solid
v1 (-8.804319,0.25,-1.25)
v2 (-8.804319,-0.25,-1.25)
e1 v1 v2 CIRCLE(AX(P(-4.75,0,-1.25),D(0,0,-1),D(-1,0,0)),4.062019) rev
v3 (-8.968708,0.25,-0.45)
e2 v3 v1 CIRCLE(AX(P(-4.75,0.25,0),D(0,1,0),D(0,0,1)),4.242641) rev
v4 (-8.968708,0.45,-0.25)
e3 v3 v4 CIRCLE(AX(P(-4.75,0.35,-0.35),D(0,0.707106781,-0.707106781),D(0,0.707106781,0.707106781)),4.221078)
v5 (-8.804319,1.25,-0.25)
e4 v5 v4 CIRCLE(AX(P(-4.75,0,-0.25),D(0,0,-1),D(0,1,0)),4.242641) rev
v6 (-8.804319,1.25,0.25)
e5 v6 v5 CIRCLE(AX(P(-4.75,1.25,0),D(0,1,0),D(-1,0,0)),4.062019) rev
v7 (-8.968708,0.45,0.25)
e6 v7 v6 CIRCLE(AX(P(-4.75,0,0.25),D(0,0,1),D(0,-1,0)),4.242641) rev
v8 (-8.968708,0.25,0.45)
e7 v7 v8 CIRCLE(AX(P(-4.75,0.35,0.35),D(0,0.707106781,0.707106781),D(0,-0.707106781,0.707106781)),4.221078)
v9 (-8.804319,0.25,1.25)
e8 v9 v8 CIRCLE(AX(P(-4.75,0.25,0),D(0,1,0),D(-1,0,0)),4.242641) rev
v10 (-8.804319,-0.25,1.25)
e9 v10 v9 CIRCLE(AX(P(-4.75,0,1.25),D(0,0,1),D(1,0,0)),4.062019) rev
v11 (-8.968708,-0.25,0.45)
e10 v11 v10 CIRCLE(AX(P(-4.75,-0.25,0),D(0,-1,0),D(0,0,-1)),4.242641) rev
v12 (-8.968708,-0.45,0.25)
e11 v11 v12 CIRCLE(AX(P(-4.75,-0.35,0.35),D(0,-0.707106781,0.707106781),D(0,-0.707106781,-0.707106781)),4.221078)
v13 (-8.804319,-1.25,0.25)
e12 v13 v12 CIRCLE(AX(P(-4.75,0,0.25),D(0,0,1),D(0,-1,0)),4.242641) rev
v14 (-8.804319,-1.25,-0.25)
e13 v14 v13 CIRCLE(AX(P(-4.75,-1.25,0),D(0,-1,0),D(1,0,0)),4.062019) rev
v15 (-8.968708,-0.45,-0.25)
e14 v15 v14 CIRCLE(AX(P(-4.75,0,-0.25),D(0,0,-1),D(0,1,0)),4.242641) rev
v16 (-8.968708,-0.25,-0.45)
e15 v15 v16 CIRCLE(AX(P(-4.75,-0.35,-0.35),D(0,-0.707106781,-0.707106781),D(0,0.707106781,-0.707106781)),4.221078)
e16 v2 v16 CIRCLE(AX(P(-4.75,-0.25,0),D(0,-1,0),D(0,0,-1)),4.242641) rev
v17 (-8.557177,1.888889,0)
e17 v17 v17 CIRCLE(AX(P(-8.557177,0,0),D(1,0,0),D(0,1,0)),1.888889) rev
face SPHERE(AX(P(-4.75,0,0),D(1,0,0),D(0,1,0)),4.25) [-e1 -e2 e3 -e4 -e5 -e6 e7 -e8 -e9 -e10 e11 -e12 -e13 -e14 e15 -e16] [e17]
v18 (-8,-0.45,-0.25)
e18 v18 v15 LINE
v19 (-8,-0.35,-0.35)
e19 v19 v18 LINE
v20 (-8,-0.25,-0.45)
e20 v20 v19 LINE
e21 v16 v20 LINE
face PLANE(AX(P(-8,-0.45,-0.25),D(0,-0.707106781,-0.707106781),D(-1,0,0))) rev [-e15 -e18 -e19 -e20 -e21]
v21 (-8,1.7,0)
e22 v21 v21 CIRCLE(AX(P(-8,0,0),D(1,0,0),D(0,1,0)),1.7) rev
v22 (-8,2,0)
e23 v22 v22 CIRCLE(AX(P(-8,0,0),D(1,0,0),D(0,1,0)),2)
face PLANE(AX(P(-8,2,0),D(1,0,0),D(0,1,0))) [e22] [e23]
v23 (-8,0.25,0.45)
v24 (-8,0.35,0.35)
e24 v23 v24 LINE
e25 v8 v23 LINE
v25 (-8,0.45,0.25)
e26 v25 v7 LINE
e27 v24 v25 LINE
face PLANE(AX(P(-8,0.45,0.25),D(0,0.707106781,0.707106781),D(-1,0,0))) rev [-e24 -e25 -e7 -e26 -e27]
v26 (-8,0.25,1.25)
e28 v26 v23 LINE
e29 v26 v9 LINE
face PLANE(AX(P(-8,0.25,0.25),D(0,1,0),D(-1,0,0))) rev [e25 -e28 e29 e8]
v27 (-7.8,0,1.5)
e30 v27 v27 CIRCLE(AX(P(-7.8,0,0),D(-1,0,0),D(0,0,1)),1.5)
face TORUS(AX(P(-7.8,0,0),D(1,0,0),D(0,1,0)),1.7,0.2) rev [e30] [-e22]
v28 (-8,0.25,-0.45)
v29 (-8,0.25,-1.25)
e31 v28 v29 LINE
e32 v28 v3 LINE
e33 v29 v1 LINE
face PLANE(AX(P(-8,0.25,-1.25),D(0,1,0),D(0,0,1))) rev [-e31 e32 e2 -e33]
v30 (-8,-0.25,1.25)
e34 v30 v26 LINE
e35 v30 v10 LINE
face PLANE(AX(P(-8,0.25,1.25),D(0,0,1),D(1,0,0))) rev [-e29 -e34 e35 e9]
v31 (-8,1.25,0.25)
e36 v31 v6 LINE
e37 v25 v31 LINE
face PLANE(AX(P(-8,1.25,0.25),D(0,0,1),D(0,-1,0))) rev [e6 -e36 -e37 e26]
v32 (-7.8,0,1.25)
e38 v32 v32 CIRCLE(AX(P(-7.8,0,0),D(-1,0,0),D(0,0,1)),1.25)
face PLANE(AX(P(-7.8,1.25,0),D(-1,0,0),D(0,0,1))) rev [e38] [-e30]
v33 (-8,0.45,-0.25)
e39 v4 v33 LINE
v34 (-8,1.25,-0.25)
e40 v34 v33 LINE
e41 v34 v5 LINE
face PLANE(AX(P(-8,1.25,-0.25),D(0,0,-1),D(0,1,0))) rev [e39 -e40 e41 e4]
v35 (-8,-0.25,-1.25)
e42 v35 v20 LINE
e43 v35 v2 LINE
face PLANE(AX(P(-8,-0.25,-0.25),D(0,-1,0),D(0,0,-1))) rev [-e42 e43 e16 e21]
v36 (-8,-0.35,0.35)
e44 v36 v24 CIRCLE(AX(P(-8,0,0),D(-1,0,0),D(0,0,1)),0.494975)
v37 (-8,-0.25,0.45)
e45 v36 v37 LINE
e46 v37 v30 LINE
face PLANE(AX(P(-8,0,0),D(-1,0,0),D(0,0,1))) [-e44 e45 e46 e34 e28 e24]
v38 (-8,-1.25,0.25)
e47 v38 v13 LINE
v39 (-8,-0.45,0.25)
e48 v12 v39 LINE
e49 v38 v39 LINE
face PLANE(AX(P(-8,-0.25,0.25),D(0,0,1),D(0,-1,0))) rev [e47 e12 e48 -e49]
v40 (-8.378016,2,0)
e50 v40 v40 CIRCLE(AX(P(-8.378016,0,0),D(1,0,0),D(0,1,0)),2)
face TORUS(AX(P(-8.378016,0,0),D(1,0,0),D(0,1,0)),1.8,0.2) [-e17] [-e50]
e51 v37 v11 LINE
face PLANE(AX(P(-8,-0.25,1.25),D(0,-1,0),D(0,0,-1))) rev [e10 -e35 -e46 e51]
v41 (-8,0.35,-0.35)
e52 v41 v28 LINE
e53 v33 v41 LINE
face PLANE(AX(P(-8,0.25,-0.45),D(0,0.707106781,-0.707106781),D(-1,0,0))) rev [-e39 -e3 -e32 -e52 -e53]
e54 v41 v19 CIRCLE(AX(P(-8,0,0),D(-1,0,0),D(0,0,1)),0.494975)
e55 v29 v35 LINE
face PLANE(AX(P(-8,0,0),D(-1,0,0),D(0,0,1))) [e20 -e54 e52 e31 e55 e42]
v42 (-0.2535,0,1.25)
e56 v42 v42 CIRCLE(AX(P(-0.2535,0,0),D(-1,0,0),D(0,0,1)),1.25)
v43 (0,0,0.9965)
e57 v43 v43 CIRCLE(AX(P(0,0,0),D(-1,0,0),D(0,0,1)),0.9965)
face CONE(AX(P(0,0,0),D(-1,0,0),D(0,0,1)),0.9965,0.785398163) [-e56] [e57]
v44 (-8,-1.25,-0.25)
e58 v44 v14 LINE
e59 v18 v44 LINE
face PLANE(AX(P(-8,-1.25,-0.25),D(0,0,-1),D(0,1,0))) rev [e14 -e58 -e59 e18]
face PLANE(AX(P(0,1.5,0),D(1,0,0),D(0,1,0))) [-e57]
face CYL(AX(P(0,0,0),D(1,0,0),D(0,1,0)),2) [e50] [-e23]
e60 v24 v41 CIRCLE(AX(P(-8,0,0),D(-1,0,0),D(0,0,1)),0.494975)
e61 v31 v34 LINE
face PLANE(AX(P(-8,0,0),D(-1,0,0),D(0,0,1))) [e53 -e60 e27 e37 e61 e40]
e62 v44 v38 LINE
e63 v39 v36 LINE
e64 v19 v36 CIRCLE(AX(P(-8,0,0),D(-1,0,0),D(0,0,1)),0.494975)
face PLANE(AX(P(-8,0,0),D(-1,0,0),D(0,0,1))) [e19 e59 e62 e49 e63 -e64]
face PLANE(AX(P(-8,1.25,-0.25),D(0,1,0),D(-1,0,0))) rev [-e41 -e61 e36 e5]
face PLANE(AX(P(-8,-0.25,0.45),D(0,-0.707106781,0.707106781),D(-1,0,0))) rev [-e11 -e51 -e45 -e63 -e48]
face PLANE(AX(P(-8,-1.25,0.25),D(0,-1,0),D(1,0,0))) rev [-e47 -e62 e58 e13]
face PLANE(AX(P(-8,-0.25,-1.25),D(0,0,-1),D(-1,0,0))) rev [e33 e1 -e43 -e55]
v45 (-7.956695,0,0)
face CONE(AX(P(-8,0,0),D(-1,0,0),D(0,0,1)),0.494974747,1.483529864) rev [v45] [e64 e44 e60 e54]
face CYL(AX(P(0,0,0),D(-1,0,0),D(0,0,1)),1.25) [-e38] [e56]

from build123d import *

# Parameters (mm, degrees)
ENL_V_MAT_EXTRU_1_DEPTH = 1
CHANFREIN1_SIZE         = 0.2
CONG_1_R                = 0.2
CONG_2_R                = 0.2


# Read off the part's stored shape, not the designer's step: M2.5 Filetages mécaniques Borne3
with BuildPart() as part:
    # Esquisse1 → Révolution1 (revolve)
    with BuildSketch(Plane.XY):
        with BuildLine():
            Line((0, 0), (-9, 0))
            ThreePointArc((-9, 0), (-8.873105626, 1.030776406), (-8.5, 2))
            Line((-8.5, 2), (-8, 2))
            Line((-8, 2), (-8, 1.5))
            Line((-8, 1.5), (0, 1.5))
            Line((0, 1.5), (0, 0))
        make_face()
    revolve(axis=Axis((0, 0, 0), (-1, 0, 0)))

    # Esquisse2 → Enlèv. mat.-Extru.1 (cut)
    with BuildSketch(Plane.ZY.offset(9)):
        Polygon((-0.25, 1.25), (0.25, 1.25), (0.25, 0.25), (1.25, 0.25), (1.25, -0.25), (0.25, -0.25), (0.25, -1.25), (-0.25, -1.25), (-0.25, -0.25), (-1.25, -0.25), (-1.25, 0.25), (-0.25, 0.25), align=None)
    extrude(amount=-ENL_V_MAT_EXTRU_1_DEPTH, mode=Mode.SUBTRACT)

    # Chanfrein1
    chanfrein1_edges = [part.edges().sort_by_distance(p)[0] for p in [
        (-8.492634293, 0.25, 0.25),
        (-8.492634293, -0.25, 0.25),
        (-8.492634293, -0.25, -0.25),
        (-8.492634293, 0.25, -0.25),
    ]]
    chamfer(chanfrein1_edges, length=CHANFREIN1_SIZE)

    # Enlèv. mat.-Extru.3 cone 1 section (through the dimple's axis) → Enlèv. mat.-Extru.3 (revolve, cut)
    with BuildSketch(Plane(origin=(-8, 0, 0), x_dir=(0, 0, 1), z_dir=(0, 1, 0))):
        Polygon((0, 0), (0.494974747, 0), (0, 0.043304679), align=None)
    revolve(axis=Axis((-8, 0, 0), (1, 0, 0)), mode=Mode.SUBTRACT)

    # Congé1
    cong_1_edges = [part.edges().sort_by_distance(p)[0] for p in [
        (-8, -1.5, 0),
    ]]
    fillet(cong_1_edges, radius=CONG_1_R)

    # Congé2
    cong_2_edges = [part.edges().sort_by_distance(p)[0] for p in [
        (-8.5, -2, 0),
    ]]
    fillet(cong_2_edges, radius=CONG_2_R)

    # M2.5 Filetages mécaniques Borne3 outline → M2.5 Filetages mécaniques Borne3 (revolve, cut)
    with BuildSketch(Plane.YX):
        Polygon((1.5, 0), (0.9965, 0), (1.25, -0.2535), (1.25, -7.8), (1.5, -7.8), align=None)
    revolve(axis=Axis((0, 0, 0), (1, 0, 0)), mode=Mode.SUBTRACT)


solid = part.part
